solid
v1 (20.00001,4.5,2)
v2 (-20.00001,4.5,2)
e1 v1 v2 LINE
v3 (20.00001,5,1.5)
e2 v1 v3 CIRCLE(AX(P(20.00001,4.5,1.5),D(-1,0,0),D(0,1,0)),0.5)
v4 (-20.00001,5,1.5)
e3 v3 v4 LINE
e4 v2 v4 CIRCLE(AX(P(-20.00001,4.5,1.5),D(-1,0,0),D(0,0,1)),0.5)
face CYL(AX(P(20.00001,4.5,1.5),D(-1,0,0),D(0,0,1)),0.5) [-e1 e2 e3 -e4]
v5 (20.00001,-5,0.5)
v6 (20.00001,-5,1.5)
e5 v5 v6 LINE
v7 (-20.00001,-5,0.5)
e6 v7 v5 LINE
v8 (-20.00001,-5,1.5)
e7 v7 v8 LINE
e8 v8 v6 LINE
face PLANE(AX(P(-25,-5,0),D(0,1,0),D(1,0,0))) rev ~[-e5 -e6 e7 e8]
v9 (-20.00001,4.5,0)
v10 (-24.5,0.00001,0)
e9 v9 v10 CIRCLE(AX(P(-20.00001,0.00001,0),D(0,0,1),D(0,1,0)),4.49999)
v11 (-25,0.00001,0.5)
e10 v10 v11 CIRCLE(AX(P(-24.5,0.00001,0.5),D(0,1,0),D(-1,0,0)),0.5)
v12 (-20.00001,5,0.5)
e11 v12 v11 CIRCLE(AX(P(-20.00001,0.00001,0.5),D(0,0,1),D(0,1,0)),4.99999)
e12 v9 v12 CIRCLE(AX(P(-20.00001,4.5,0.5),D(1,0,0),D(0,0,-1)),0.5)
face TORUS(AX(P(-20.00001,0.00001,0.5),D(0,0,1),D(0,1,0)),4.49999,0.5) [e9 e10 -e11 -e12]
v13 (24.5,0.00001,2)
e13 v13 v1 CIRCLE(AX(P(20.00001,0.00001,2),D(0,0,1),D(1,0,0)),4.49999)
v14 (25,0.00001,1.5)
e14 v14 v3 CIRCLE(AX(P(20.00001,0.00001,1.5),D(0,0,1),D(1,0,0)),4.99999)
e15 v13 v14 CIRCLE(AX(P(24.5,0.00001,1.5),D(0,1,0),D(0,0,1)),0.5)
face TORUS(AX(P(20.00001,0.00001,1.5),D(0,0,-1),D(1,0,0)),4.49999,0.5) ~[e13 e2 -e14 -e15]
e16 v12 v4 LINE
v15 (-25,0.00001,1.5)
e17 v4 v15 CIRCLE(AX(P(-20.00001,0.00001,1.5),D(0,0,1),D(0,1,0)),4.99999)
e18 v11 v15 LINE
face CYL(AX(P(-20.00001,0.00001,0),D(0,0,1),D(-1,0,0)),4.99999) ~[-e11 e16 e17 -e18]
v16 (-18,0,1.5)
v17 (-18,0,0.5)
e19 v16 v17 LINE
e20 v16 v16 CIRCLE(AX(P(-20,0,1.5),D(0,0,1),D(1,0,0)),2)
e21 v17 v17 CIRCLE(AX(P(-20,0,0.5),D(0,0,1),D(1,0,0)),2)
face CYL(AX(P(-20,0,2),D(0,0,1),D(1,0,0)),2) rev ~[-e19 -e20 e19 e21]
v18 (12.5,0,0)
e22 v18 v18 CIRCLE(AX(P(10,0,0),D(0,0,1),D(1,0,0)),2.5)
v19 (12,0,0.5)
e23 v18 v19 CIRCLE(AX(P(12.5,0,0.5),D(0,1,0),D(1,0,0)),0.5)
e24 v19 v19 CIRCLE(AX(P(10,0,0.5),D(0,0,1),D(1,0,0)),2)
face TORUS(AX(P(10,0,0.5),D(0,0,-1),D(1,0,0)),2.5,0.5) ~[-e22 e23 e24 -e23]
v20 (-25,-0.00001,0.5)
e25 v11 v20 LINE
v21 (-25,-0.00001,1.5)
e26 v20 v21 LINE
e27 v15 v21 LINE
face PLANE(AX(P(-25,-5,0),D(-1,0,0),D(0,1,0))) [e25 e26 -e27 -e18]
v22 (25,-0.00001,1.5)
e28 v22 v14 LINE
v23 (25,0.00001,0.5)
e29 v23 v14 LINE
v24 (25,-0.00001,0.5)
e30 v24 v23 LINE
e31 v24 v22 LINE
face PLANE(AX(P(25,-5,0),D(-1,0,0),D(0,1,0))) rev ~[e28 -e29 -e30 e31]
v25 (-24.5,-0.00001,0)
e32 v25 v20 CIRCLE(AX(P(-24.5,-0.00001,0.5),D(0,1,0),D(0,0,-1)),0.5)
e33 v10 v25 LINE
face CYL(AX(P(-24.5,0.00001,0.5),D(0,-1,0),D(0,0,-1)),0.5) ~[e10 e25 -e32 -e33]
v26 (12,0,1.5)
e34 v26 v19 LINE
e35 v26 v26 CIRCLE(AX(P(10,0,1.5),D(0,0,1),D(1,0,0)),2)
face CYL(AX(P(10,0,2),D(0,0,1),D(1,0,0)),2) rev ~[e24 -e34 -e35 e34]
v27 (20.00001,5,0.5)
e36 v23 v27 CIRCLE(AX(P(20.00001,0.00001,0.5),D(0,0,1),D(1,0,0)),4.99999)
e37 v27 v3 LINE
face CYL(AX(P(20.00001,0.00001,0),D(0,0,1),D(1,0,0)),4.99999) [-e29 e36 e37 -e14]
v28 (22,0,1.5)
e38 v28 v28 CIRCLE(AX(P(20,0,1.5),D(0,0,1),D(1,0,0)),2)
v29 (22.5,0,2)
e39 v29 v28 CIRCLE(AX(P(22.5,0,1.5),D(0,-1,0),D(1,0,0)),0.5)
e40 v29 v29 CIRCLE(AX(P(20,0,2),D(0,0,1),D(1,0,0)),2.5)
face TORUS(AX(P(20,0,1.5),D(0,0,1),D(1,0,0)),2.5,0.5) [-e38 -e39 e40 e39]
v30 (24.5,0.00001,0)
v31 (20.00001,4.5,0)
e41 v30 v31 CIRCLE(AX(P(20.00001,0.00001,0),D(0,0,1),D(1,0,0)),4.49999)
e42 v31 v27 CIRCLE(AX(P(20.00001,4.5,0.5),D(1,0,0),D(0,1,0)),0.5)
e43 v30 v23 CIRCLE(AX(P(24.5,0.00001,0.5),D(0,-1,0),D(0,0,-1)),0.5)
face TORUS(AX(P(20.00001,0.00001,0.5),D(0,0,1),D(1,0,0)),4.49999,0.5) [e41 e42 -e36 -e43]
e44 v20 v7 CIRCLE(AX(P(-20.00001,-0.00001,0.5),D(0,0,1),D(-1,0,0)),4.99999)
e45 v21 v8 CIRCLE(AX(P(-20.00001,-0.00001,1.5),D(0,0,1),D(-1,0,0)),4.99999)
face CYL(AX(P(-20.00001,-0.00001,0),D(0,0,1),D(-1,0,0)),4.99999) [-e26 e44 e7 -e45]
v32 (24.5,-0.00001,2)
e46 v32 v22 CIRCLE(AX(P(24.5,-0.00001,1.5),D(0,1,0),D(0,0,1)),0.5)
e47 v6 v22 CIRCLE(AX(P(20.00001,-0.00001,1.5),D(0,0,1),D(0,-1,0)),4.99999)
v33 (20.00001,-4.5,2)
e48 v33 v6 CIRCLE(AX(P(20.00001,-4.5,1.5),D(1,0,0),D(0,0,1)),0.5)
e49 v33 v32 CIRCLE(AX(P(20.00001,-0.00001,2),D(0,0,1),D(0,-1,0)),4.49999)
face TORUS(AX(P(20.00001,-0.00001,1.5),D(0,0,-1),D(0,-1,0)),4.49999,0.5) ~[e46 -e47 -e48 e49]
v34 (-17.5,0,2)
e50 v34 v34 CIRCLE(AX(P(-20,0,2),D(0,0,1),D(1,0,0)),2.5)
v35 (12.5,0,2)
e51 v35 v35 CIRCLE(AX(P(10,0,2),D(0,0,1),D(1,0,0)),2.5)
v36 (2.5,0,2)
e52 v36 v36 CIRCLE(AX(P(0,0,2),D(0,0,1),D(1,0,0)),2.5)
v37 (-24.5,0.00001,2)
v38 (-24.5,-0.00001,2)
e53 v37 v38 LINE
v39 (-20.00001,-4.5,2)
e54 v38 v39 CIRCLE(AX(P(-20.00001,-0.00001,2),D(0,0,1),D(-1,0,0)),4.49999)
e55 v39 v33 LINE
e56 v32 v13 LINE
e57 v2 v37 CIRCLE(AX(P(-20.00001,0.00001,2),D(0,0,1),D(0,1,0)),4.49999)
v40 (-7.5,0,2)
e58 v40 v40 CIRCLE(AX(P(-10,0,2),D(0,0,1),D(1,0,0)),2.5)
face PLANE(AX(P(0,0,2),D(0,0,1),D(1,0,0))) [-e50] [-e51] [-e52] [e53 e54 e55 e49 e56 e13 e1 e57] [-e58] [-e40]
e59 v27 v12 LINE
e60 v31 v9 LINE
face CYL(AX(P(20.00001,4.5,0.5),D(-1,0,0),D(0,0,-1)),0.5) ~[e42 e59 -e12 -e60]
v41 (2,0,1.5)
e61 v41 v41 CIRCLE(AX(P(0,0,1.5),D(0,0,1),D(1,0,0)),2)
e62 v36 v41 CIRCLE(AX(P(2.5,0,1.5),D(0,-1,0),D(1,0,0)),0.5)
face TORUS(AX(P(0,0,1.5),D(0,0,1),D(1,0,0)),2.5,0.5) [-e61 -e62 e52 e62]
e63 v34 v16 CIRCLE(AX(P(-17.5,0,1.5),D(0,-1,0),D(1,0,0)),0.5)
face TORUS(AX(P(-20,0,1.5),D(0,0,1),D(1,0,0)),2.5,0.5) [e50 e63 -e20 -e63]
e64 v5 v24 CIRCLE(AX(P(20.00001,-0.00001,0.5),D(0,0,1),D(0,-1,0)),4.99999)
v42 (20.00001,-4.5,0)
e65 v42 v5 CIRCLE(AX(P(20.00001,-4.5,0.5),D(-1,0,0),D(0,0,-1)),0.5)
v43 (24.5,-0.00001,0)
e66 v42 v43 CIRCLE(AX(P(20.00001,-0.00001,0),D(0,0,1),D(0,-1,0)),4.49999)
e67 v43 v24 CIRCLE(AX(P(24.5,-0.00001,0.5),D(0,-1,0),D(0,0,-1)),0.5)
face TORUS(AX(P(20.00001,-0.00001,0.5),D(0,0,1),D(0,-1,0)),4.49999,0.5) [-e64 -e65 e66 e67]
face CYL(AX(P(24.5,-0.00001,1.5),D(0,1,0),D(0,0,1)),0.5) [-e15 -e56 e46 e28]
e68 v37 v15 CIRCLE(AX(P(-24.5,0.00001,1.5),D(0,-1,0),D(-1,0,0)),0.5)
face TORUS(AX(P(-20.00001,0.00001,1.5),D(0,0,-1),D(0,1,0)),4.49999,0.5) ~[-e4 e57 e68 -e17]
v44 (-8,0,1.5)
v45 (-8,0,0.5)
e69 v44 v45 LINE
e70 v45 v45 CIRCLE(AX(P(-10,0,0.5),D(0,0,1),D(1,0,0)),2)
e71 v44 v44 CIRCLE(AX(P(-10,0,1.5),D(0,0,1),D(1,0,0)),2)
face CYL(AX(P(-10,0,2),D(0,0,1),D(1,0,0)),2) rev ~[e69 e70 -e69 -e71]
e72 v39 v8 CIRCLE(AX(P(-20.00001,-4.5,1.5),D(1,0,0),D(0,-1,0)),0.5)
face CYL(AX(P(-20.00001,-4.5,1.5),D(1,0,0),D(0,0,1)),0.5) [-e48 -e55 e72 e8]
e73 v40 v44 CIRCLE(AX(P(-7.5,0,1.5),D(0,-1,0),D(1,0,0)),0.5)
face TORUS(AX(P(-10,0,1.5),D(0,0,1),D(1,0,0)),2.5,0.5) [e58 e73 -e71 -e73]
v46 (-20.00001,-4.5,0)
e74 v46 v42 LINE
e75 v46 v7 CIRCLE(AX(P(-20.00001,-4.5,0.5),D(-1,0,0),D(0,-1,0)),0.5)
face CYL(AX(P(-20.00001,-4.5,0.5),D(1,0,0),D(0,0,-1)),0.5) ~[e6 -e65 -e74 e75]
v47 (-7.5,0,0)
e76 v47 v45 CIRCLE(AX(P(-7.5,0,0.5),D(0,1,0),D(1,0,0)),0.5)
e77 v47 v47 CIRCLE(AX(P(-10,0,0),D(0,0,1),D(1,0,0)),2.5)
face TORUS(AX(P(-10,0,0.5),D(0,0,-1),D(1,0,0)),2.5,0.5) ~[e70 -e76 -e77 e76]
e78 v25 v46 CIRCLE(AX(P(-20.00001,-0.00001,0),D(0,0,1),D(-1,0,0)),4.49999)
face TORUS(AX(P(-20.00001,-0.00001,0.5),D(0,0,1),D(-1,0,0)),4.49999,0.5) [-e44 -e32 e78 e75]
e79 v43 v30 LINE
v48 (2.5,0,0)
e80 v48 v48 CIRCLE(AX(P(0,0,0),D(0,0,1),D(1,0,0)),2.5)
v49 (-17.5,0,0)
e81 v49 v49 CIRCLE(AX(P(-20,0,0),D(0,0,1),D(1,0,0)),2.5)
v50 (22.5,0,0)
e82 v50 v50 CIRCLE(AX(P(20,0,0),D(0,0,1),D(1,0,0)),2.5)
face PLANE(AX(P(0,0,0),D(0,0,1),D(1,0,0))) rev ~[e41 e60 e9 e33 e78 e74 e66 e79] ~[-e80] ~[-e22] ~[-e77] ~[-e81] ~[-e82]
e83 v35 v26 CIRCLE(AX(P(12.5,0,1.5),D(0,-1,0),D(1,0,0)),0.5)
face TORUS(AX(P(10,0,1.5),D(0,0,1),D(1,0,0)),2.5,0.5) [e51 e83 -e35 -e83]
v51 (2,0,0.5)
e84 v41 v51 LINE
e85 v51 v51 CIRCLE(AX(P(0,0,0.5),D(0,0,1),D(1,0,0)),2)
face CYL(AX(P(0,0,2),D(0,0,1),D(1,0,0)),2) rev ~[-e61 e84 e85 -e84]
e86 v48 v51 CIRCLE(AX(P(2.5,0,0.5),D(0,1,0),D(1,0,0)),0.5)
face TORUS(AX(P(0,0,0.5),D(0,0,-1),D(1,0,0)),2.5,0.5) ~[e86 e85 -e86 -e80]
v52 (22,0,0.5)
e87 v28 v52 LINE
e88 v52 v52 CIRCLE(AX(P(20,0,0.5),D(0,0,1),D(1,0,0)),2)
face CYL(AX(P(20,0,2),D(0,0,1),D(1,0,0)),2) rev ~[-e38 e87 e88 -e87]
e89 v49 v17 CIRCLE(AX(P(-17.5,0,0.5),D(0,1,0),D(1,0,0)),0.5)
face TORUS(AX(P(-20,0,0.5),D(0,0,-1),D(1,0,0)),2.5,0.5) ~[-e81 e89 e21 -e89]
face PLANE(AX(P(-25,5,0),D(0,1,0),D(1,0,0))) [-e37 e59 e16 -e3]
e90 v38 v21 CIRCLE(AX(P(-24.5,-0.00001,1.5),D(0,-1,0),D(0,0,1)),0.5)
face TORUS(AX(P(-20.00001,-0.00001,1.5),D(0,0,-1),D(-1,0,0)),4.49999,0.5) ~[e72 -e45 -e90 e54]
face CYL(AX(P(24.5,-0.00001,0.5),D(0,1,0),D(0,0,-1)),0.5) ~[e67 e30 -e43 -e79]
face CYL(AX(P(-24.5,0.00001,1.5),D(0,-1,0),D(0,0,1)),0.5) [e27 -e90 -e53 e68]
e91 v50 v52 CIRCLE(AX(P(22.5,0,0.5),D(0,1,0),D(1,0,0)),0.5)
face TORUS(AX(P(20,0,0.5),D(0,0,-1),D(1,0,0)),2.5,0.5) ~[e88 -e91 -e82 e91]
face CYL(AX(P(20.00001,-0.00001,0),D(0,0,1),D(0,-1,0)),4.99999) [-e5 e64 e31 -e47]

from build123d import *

# Parameters (mm, degrees)
F0_W     = 50
F0_H     = 10
F1_DEPTH = 2
F3_R     = 2
F2_DEPTH = 25
F4_R     = 4.99999
F5_R     = 2
F6_DEPTH = 25
F7_R     = 0.5


# Not quite as in the source:
# - a fillet or chamfer is up to 0.001 mm smaller than in the source, because OpenCascade refuses the exact size


with BuildPart() as f1:
    # F0 (on Top) → F1 (new body)
    with BuildSketch(Plane.XY):
        Rectangle(F0_W, F0_H)
    extrude(amount=F1_DEPTH)

    # F3 (on Top) → F2 (cut)
    with BuildSketch(Plane.XY):
        with Locations((-20, 0)):
            Circle(F3_R)
        with Locations((-10, 0)):
            Circle(F3_R)
        Circle(F3_R)
        with Locations((10, 0)):
            Circle(F3_R)
        with Locations((20, 0)):
            Circle(F3_R)
    extrude(amount=-F2_DEPTH, mode=Mode.SUBTRACT)

    # F4 (radius 5 in the source; OpenCascade refuses exactly that, so slightly less here)
    f4_edges = [f1.edges().sort_by_distance(p)[0] for p in [
        (25, -5, 1),
        (25, 5, 1),
        (-25, -5, 1),
        (-25, 5, 1),
    ]]
    fillet(f4_edges, radius=F4_R)

    # F5 (on face) → F6 (cut)
    with BuildSketch(Plane.XY.offset(2)):
        with Locations((20, 0)):
            Circle(F5_R)
        with Locations((10, 0)):
            Circle(F5_R)
        Circle(F5_R)
        with Locations((-10, 0)):
            Circle(F5_R)
        with Locations((-20, 0)):
            Circle(F5_R)
    extrude(amount=-F6_DEPTH, mode=Mode.SUBTRACT)

    # F7
    f7_edges = [f1.edges().sort_by_distance(p)[0] for p in [
        (25, 0, 2),
        (23.535537, -3.535537, 2),
        (23.535537, 3.535537, 2),
        (0, -5, 2),
        (0, 5, 2),
        (-23.535537, -3.535537, 2),
        (-23.535537, 3.535537, 2),
        (-25, 0, 2),
        (-22, 0, 2),
        (-12, 0, 2),
        (-2, 0, 2),
        (8, 0, 2),
        (18, 0, 2),
        (25, 0, 0),
        (23.535537, -3.535537, 0),
        (23.535537, 3.535537, 0),
        (0, -5, 0),
        (0, 5, 0),
        (-23.535537, -3.535537, 0),
        (-23.535537, 3.535537, 0),
        (-25, 0, 0),
        (-22, 0, 0),
        (-12, 0, 0),
        (-2, 0, 0),
        (8, 0, 0),
        (18, 0, 0),
    ]]
    fillet(f7_edges, radius=F7_R)


solid = f1.part
